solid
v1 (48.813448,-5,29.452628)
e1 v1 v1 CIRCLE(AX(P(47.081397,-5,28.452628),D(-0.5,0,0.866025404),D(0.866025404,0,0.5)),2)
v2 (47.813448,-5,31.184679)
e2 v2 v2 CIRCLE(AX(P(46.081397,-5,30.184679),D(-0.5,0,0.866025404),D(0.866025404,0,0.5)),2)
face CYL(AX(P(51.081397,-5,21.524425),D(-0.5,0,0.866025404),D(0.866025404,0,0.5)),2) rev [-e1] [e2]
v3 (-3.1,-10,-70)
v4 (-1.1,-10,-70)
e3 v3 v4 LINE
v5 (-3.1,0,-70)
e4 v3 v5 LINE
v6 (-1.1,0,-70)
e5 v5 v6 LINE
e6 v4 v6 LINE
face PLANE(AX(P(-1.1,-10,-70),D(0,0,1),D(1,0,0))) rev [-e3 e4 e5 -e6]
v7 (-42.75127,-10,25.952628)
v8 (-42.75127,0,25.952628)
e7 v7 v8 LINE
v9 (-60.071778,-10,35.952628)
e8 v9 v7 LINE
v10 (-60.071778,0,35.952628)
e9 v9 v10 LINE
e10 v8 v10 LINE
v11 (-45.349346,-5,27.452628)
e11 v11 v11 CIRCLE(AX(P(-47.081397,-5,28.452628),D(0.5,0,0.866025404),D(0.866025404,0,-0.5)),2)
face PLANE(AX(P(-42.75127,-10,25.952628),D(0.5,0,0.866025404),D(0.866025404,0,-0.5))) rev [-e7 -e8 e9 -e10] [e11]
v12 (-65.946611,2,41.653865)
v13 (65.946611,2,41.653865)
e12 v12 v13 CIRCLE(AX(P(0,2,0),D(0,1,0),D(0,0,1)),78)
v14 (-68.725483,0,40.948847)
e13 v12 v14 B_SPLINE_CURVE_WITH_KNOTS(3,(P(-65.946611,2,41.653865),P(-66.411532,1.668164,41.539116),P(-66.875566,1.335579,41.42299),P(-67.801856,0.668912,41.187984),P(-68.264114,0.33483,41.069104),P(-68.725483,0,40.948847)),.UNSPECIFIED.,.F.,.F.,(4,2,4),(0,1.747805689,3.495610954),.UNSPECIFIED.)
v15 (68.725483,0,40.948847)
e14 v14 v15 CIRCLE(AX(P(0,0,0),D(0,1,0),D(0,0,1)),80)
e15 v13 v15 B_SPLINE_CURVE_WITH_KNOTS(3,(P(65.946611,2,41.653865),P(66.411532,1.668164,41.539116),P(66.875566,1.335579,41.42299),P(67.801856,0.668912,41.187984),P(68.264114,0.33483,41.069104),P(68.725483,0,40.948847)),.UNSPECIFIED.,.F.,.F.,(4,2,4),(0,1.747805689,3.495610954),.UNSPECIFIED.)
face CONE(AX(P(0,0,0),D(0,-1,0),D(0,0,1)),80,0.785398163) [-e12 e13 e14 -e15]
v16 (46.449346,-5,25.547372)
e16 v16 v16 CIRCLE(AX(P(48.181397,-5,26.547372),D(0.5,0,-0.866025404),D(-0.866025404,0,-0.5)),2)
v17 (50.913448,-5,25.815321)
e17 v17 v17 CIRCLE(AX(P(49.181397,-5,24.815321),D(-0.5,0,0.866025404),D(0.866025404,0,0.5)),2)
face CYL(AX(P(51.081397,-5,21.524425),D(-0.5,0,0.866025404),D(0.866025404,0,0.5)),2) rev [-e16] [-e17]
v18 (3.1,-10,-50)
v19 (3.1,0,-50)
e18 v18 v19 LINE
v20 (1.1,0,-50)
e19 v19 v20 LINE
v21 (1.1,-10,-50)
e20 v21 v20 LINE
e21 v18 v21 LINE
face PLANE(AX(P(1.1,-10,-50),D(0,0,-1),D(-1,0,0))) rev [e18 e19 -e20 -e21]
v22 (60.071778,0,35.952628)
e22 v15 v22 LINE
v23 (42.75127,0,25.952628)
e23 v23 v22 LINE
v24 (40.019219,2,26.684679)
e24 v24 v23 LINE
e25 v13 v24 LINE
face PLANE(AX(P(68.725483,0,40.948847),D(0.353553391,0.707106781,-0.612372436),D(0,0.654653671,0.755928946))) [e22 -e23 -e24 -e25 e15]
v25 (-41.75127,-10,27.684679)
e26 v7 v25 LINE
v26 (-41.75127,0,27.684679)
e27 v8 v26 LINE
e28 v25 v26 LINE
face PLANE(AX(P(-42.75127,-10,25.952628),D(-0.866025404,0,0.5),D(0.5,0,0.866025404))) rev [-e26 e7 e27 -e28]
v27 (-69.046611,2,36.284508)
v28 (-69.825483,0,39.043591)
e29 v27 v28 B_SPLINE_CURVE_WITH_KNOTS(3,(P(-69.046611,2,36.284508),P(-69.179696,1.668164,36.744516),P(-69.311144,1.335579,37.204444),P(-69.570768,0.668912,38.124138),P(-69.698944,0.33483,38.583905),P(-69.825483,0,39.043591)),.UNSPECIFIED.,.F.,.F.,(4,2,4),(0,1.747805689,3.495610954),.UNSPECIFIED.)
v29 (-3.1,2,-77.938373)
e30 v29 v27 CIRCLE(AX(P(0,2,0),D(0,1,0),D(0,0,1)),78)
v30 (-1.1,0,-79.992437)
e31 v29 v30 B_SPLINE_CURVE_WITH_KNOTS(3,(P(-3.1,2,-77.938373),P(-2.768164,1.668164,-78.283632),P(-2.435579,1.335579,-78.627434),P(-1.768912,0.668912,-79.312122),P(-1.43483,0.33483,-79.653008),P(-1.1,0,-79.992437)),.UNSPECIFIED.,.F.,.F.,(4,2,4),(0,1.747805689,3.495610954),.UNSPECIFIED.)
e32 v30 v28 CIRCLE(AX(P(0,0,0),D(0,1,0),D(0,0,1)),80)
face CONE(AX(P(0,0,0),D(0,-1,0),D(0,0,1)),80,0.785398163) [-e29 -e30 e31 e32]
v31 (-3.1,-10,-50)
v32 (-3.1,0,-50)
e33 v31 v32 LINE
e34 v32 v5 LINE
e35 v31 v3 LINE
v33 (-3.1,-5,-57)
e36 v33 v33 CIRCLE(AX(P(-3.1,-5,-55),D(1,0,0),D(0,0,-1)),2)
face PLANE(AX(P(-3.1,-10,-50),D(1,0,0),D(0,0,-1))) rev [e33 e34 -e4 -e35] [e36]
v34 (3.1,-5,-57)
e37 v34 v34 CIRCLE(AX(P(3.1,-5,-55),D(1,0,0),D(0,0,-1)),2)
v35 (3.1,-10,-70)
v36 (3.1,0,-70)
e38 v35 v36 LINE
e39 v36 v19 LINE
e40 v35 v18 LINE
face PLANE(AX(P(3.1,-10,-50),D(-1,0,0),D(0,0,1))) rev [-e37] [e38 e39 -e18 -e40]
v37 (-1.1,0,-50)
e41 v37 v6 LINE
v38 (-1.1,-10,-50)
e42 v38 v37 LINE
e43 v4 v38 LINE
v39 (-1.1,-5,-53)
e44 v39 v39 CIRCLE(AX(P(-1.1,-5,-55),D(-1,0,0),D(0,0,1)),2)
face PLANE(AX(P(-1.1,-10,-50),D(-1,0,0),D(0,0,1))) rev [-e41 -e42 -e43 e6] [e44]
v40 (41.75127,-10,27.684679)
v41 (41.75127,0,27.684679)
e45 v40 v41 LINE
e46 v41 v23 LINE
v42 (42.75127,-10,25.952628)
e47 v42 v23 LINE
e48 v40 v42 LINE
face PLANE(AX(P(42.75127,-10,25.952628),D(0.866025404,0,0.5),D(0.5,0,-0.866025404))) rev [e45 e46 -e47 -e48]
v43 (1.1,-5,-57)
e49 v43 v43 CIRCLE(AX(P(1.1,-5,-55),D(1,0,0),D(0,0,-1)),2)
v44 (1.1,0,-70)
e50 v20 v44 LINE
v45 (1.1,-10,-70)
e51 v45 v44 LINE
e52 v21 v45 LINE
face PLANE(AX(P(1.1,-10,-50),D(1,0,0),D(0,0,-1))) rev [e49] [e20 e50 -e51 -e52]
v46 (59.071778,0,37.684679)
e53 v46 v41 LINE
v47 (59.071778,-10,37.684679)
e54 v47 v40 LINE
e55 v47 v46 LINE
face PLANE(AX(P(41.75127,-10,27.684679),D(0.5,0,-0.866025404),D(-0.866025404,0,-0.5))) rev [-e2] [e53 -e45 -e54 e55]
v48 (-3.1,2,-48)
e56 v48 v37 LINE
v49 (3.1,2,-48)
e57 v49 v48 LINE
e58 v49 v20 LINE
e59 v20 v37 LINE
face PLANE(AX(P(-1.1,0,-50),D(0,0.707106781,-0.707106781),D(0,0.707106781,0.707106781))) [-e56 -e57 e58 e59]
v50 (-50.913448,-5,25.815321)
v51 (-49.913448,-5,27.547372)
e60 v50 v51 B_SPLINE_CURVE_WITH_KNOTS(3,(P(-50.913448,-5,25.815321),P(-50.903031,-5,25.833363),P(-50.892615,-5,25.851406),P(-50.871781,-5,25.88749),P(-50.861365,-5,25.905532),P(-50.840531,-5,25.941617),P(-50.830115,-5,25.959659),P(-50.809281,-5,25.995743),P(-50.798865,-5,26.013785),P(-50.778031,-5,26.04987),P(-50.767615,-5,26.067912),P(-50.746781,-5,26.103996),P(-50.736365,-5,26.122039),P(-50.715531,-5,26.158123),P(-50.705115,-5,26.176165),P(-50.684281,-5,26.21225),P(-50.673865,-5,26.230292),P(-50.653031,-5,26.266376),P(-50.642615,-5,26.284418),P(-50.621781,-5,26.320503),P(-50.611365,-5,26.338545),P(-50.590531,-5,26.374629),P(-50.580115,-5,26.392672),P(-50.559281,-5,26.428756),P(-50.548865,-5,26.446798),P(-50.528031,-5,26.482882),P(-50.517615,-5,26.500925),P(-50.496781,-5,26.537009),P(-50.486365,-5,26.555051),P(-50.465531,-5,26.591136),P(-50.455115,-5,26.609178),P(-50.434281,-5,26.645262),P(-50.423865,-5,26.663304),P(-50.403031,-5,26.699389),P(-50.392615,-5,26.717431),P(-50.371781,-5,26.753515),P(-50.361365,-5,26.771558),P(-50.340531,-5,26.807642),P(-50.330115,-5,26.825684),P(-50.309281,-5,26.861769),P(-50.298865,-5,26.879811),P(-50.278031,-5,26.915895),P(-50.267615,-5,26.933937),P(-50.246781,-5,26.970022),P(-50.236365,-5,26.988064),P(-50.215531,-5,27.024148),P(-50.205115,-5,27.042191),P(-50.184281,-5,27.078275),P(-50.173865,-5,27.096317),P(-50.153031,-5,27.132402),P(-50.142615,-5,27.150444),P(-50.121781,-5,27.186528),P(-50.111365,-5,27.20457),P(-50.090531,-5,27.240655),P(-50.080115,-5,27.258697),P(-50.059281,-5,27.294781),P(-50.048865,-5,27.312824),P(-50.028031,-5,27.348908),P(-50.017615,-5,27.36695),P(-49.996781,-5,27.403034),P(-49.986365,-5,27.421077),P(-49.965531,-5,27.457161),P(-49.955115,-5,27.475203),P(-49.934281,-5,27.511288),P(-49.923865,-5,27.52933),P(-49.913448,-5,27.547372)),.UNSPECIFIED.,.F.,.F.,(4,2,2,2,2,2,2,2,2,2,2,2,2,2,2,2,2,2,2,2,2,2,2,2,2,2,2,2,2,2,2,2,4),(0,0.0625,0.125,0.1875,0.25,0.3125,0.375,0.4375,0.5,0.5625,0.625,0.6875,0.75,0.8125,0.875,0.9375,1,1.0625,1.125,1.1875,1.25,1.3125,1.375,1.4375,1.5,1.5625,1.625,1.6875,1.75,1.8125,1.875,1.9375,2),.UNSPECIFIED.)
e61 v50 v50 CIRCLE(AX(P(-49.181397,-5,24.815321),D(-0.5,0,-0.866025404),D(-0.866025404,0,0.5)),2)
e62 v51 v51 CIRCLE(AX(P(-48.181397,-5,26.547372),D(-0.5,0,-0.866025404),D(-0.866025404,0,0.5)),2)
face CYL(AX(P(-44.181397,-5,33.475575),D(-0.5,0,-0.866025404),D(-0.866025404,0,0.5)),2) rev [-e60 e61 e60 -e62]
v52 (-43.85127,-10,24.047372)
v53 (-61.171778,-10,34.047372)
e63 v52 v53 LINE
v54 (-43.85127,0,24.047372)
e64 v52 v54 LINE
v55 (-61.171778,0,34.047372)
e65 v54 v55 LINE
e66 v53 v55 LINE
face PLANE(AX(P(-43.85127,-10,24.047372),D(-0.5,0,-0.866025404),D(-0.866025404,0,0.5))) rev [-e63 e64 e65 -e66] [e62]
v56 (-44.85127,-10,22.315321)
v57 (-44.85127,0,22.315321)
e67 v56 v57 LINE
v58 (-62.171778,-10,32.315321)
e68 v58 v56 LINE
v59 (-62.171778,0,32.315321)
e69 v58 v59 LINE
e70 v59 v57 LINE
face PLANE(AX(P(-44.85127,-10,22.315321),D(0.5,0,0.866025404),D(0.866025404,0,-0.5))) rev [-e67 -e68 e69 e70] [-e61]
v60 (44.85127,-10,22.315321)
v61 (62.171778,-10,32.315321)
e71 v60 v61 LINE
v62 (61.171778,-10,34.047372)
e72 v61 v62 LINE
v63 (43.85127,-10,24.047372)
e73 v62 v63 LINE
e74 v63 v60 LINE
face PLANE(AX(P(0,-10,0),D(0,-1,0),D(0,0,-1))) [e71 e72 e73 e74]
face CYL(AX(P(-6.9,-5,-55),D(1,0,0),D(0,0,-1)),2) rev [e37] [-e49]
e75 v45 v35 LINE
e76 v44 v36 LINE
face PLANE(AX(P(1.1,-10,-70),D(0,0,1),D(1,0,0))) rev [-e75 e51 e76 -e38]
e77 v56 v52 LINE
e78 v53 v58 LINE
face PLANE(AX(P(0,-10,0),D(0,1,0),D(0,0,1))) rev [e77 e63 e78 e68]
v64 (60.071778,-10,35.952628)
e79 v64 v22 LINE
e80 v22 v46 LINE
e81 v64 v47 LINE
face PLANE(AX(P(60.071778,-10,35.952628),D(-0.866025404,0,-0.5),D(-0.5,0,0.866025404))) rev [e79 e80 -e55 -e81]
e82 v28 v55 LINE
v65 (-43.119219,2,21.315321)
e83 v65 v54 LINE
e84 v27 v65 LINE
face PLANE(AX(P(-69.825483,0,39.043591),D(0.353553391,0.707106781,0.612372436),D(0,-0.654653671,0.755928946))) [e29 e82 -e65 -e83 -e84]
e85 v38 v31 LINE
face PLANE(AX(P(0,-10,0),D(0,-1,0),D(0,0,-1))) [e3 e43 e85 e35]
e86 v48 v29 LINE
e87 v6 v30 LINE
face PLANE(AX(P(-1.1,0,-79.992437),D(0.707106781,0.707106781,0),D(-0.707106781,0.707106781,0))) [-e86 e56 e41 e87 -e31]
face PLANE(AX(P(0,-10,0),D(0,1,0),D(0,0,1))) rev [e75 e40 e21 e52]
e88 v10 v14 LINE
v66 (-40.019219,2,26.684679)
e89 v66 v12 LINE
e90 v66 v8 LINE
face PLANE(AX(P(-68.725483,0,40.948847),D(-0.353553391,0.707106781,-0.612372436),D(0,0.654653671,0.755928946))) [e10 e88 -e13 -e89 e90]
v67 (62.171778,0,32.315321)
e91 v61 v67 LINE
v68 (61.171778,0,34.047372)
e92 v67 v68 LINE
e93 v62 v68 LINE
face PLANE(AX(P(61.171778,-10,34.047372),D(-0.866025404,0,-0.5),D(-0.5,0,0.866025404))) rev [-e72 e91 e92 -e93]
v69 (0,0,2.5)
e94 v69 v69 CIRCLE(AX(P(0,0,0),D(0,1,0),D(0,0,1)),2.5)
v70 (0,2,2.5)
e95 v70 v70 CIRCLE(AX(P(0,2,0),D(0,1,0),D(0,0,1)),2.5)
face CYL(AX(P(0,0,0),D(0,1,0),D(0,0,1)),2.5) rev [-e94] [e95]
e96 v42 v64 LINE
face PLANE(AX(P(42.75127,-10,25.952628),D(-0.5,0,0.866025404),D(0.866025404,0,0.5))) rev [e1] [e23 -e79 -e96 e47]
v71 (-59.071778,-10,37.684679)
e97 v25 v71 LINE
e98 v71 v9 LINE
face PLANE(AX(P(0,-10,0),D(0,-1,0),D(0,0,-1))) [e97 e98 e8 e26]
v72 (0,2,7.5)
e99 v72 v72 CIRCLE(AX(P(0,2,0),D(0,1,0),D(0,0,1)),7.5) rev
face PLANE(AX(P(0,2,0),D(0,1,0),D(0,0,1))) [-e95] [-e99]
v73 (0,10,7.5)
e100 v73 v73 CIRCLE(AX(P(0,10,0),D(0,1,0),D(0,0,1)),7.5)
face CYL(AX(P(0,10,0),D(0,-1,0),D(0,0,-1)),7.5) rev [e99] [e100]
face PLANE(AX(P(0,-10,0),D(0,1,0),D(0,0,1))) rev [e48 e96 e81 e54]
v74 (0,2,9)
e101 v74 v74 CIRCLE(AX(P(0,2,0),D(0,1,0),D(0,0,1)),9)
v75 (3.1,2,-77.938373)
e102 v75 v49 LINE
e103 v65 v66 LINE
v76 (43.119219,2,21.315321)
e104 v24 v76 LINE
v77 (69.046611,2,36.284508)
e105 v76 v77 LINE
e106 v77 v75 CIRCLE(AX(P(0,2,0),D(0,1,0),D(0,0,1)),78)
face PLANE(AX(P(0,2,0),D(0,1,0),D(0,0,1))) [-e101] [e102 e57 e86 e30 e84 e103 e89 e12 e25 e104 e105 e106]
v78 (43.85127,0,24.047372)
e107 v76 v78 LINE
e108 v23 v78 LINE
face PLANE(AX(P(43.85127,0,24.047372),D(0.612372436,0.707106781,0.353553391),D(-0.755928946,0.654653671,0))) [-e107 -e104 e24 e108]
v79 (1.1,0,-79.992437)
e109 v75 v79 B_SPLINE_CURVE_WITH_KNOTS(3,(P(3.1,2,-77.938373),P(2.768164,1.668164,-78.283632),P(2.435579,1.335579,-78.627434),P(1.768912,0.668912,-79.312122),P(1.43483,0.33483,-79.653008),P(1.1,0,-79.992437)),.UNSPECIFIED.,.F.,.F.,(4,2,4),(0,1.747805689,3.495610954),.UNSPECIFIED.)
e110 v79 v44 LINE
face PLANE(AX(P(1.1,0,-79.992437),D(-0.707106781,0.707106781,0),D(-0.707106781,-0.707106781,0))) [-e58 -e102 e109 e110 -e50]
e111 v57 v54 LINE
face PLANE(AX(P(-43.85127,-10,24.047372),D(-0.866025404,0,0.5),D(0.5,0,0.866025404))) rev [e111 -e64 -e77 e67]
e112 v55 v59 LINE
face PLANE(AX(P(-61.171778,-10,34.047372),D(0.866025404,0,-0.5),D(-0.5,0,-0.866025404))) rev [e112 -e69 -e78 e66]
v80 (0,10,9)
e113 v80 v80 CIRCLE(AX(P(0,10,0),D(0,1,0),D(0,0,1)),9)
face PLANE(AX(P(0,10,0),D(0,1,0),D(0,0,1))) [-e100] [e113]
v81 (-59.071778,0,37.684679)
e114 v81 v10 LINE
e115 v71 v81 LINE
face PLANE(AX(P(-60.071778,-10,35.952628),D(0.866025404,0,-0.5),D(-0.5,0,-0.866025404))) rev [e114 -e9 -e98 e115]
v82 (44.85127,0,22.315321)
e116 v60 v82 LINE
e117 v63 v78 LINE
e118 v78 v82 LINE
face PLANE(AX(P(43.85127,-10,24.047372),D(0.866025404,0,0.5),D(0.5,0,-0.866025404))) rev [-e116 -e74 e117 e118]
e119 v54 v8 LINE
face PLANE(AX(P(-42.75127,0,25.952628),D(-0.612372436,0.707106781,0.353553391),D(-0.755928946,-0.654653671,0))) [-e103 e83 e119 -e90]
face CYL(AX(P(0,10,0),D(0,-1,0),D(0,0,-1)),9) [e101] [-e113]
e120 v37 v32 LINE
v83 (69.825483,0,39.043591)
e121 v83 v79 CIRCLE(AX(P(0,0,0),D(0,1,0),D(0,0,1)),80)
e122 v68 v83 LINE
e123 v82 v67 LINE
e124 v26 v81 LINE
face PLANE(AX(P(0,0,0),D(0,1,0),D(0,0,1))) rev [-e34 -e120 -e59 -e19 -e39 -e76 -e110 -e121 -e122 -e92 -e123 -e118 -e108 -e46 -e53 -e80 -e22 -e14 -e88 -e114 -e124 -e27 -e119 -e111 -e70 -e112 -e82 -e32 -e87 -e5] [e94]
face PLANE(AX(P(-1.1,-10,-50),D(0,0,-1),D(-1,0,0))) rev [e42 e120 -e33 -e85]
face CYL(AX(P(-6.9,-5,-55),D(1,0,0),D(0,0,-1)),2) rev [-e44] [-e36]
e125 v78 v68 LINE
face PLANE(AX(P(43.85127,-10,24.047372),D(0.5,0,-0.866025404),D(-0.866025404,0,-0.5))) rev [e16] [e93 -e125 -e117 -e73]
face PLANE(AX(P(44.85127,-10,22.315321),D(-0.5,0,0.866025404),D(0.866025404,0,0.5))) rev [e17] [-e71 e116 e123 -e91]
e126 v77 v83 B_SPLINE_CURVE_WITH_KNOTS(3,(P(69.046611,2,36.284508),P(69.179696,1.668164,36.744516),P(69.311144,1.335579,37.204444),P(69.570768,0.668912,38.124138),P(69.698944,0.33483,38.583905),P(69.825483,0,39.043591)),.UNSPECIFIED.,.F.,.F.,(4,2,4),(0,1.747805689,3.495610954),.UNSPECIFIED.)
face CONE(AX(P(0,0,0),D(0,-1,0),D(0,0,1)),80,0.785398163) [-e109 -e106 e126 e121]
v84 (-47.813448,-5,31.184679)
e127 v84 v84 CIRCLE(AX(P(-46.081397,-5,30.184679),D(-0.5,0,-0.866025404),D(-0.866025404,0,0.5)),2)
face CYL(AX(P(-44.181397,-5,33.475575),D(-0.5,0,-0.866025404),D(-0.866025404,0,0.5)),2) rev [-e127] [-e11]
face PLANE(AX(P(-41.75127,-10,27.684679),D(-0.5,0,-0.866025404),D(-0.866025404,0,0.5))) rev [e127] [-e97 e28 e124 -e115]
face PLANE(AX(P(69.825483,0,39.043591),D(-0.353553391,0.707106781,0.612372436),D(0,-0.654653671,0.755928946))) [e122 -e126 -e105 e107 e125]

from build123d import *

# Parameters (mm, degrees)
BOSS_EXTRUDE1_DEPTH = 2
BOSS_EXTRUDE1_DRAFT = 45
SKETCH2_R           = 2.5
CUT_EXTRUDE1_DEPTH  = 114.154761278
SKETCH3_R           = 9
SKETCH3_R_2         = 7.5
BOSS_EXTRUDE2_DEPTH = 8
SKETCH4_W           = 2
SKETCH4_H           = 20
BOSS_EXTRUDE3_DEPTH = 10
SKETCH5_R           = 2
CUT_EXTRUDE2_DEPTH  = 10
CIRPATTERN1_COUNT   = 3


# Read off the part's stored shape, not the designer's step: Boss-Extrude1
with BuildPart() as part:
    # Boss-Extrude1 outline → Boss-Extrude1 (with draft: the straight prism first)
    with BuildSketch(Plane(origin=(0, 2, 0), x_dir=(1, 0, 0), z_dir=(0, 1, 0))):
        with BuildLine():
            ThreePointArc((-3.1, 77.938373091), (-67.549981495, 39), (-69.046611026, -36.284507794))
            Line((-69.046611026, -36.284507794), (-43.119219382, -21.315321248))
            Line((-43.119219382, -21.315321248), (-40.019219382, -26.684678752))
            Line((-40.019219382, -26.684678752), (-65.946611026, -41.653865297))
            ThreePointArc((-65.946611026, -41.653865297), (0, -78), (65.946611026, -41.653865297))
            Line((65.946611026, -41.653865297), (40.019219382, -26.684678752))
            Line((40.019219382, -26.684678752), (43.119219382, -21.315321248))
            Line((43.119219382, -21.315321248), (69.046611026, -36.284507794))
            ThreePointArc((69.046611026, -36.284507794), (67.549981495, 39), (3.1, 77.938373091))
            Line((3.1, 77.938373091), (3.1, 48))
            Line((3.1, 48), (-3.1, 48))
            Line((-3.1, 48), (-3.1, 77.938373091))
        make_face()
    extrude(amount=-BOSS_EXTRUDE1_DEPTH)
    # Boss-Extrude1: the draft: its side faces are tilted about the plane it starts from
    boss_extrude1_sides = [part.faces().sort_by_distance(p)[0] for p in [
        (67.549981495, 1, -39),
        (3.1, 1, -62.969186546),
        (0, 1, -48),
        (-3.1, 1, -62.969186546),
        (-67.549981495, 1, -39),
        (-56.082915204, 1, 28.799914521),
        (-41.569219382, 1, 24),
        (-52.982915204, 1, 34.169272025),
        (0, 1, 78),
        (52.982915204, 1, 34.169272025),
        (41.569219382, 1, 24),
        (56.082915204, 1, 28.799914521),
    ]]
    draft(boss_extrude1_sides, Plane(origin=(0, 2, 0), x_dir=(1, 0, 0), z_dir=(0, 1, 0)), BOSS_EXTRUDE1_DRAFT)

    # Sketch2 → Cut-Extrude1 (cut, through all)
    with BuildSketch(Plane(origin=(0, 2, 0), x_dir=(1, 0, 0), z_dir=(0, 1, 0))):
        with Locations(Location((0, 0, 0), (0, 0, 270))):
            Circle(SKETCH2_R)
    extrude(amount=-CUT_EXTRUDE1_DEPTH, mode=Mode.SUBTRACT)

    # Sketch3 → Boss-Extrude2 (add)
    with BuildSketch(Plane(origin=(0, 2, 0), x_dir=(1, 0, 0), z_dir=(0, 1, 0))):
        with Locations(Location((0, 0, 0), (0, 0, 270))):
            Circle(SKETCH3_R)
        with Locations(Location((0, 0, 0), (0, 0, 270))):
            Circle(SKETCH3_R_2, mode=Mode.SUBTRACT)
    extrude(amount=BOSS_EXTRUDE2_DEPTH)

    # Sketch4 → Boss-Extrude3 (add)
    with BuildSketch(Plane.XZ):
        Polygon((42.751270189, 25.952627944), (60.071778265, 35.952627944), (59.071778265, 37.684678752), (41.751270189, 27.684678752), align=None)
        Polygon((43.851270189, 24.047372056), (61.171778265, 34.047372056), (62.171778265, 32.315321248), (44.851270189, 22.315321248), align=None)
        with Locations((2.1, -60)):
            Rectangle(SKETCH4_W, SKETCH4_H)
        with Locations((-2.1, -60)):
            Rectangle(SKETCH4_W, SKETCH4_H)
        Polygon((-44.851270189, 22.315321248), (-62.171778265, 32.315321248), (-61.171778265, 34.047372056), (-43.851270189, 24.047372056), align=None)
        Polygon((-42.751270189, 25.952627944), (-60.071778265, 35.952627944), (-59.071778265, 37.684678752), (-41.751270189, 27.684678752), align=None)
    extrude(amount=BOSS_EXTRUDE3_DEPTH)

    # Sketch5 → Cut-Extrude2 (cut)
    with BuildSketch(Plane(origin=(3.1, 0, 0), x_dir=(0, 0, -1), z_dir=(1, 0, 0))):
        with Locations((55, -5)):
            Circle(SKETCH5_R)
    cut_extrude2 = extrude(amount=-CUT_EXTRUDE2_DEPTH, mode=Mode.SUBTRACT)

    # CirPattern1: Cut-Extrude2 ×3 about axis
    cirpattern1_axis = Axis((0, 10, 0), (0, -1, 0))
    for i in range(1, CIRPATTERN1_COUNT):
        add(cut_extrude2.rotate(cirpattern1_axis, i * 360 / CIRPATTERN1_COUNT), mode=Mode.SUBTRACT)


solid = part.part
